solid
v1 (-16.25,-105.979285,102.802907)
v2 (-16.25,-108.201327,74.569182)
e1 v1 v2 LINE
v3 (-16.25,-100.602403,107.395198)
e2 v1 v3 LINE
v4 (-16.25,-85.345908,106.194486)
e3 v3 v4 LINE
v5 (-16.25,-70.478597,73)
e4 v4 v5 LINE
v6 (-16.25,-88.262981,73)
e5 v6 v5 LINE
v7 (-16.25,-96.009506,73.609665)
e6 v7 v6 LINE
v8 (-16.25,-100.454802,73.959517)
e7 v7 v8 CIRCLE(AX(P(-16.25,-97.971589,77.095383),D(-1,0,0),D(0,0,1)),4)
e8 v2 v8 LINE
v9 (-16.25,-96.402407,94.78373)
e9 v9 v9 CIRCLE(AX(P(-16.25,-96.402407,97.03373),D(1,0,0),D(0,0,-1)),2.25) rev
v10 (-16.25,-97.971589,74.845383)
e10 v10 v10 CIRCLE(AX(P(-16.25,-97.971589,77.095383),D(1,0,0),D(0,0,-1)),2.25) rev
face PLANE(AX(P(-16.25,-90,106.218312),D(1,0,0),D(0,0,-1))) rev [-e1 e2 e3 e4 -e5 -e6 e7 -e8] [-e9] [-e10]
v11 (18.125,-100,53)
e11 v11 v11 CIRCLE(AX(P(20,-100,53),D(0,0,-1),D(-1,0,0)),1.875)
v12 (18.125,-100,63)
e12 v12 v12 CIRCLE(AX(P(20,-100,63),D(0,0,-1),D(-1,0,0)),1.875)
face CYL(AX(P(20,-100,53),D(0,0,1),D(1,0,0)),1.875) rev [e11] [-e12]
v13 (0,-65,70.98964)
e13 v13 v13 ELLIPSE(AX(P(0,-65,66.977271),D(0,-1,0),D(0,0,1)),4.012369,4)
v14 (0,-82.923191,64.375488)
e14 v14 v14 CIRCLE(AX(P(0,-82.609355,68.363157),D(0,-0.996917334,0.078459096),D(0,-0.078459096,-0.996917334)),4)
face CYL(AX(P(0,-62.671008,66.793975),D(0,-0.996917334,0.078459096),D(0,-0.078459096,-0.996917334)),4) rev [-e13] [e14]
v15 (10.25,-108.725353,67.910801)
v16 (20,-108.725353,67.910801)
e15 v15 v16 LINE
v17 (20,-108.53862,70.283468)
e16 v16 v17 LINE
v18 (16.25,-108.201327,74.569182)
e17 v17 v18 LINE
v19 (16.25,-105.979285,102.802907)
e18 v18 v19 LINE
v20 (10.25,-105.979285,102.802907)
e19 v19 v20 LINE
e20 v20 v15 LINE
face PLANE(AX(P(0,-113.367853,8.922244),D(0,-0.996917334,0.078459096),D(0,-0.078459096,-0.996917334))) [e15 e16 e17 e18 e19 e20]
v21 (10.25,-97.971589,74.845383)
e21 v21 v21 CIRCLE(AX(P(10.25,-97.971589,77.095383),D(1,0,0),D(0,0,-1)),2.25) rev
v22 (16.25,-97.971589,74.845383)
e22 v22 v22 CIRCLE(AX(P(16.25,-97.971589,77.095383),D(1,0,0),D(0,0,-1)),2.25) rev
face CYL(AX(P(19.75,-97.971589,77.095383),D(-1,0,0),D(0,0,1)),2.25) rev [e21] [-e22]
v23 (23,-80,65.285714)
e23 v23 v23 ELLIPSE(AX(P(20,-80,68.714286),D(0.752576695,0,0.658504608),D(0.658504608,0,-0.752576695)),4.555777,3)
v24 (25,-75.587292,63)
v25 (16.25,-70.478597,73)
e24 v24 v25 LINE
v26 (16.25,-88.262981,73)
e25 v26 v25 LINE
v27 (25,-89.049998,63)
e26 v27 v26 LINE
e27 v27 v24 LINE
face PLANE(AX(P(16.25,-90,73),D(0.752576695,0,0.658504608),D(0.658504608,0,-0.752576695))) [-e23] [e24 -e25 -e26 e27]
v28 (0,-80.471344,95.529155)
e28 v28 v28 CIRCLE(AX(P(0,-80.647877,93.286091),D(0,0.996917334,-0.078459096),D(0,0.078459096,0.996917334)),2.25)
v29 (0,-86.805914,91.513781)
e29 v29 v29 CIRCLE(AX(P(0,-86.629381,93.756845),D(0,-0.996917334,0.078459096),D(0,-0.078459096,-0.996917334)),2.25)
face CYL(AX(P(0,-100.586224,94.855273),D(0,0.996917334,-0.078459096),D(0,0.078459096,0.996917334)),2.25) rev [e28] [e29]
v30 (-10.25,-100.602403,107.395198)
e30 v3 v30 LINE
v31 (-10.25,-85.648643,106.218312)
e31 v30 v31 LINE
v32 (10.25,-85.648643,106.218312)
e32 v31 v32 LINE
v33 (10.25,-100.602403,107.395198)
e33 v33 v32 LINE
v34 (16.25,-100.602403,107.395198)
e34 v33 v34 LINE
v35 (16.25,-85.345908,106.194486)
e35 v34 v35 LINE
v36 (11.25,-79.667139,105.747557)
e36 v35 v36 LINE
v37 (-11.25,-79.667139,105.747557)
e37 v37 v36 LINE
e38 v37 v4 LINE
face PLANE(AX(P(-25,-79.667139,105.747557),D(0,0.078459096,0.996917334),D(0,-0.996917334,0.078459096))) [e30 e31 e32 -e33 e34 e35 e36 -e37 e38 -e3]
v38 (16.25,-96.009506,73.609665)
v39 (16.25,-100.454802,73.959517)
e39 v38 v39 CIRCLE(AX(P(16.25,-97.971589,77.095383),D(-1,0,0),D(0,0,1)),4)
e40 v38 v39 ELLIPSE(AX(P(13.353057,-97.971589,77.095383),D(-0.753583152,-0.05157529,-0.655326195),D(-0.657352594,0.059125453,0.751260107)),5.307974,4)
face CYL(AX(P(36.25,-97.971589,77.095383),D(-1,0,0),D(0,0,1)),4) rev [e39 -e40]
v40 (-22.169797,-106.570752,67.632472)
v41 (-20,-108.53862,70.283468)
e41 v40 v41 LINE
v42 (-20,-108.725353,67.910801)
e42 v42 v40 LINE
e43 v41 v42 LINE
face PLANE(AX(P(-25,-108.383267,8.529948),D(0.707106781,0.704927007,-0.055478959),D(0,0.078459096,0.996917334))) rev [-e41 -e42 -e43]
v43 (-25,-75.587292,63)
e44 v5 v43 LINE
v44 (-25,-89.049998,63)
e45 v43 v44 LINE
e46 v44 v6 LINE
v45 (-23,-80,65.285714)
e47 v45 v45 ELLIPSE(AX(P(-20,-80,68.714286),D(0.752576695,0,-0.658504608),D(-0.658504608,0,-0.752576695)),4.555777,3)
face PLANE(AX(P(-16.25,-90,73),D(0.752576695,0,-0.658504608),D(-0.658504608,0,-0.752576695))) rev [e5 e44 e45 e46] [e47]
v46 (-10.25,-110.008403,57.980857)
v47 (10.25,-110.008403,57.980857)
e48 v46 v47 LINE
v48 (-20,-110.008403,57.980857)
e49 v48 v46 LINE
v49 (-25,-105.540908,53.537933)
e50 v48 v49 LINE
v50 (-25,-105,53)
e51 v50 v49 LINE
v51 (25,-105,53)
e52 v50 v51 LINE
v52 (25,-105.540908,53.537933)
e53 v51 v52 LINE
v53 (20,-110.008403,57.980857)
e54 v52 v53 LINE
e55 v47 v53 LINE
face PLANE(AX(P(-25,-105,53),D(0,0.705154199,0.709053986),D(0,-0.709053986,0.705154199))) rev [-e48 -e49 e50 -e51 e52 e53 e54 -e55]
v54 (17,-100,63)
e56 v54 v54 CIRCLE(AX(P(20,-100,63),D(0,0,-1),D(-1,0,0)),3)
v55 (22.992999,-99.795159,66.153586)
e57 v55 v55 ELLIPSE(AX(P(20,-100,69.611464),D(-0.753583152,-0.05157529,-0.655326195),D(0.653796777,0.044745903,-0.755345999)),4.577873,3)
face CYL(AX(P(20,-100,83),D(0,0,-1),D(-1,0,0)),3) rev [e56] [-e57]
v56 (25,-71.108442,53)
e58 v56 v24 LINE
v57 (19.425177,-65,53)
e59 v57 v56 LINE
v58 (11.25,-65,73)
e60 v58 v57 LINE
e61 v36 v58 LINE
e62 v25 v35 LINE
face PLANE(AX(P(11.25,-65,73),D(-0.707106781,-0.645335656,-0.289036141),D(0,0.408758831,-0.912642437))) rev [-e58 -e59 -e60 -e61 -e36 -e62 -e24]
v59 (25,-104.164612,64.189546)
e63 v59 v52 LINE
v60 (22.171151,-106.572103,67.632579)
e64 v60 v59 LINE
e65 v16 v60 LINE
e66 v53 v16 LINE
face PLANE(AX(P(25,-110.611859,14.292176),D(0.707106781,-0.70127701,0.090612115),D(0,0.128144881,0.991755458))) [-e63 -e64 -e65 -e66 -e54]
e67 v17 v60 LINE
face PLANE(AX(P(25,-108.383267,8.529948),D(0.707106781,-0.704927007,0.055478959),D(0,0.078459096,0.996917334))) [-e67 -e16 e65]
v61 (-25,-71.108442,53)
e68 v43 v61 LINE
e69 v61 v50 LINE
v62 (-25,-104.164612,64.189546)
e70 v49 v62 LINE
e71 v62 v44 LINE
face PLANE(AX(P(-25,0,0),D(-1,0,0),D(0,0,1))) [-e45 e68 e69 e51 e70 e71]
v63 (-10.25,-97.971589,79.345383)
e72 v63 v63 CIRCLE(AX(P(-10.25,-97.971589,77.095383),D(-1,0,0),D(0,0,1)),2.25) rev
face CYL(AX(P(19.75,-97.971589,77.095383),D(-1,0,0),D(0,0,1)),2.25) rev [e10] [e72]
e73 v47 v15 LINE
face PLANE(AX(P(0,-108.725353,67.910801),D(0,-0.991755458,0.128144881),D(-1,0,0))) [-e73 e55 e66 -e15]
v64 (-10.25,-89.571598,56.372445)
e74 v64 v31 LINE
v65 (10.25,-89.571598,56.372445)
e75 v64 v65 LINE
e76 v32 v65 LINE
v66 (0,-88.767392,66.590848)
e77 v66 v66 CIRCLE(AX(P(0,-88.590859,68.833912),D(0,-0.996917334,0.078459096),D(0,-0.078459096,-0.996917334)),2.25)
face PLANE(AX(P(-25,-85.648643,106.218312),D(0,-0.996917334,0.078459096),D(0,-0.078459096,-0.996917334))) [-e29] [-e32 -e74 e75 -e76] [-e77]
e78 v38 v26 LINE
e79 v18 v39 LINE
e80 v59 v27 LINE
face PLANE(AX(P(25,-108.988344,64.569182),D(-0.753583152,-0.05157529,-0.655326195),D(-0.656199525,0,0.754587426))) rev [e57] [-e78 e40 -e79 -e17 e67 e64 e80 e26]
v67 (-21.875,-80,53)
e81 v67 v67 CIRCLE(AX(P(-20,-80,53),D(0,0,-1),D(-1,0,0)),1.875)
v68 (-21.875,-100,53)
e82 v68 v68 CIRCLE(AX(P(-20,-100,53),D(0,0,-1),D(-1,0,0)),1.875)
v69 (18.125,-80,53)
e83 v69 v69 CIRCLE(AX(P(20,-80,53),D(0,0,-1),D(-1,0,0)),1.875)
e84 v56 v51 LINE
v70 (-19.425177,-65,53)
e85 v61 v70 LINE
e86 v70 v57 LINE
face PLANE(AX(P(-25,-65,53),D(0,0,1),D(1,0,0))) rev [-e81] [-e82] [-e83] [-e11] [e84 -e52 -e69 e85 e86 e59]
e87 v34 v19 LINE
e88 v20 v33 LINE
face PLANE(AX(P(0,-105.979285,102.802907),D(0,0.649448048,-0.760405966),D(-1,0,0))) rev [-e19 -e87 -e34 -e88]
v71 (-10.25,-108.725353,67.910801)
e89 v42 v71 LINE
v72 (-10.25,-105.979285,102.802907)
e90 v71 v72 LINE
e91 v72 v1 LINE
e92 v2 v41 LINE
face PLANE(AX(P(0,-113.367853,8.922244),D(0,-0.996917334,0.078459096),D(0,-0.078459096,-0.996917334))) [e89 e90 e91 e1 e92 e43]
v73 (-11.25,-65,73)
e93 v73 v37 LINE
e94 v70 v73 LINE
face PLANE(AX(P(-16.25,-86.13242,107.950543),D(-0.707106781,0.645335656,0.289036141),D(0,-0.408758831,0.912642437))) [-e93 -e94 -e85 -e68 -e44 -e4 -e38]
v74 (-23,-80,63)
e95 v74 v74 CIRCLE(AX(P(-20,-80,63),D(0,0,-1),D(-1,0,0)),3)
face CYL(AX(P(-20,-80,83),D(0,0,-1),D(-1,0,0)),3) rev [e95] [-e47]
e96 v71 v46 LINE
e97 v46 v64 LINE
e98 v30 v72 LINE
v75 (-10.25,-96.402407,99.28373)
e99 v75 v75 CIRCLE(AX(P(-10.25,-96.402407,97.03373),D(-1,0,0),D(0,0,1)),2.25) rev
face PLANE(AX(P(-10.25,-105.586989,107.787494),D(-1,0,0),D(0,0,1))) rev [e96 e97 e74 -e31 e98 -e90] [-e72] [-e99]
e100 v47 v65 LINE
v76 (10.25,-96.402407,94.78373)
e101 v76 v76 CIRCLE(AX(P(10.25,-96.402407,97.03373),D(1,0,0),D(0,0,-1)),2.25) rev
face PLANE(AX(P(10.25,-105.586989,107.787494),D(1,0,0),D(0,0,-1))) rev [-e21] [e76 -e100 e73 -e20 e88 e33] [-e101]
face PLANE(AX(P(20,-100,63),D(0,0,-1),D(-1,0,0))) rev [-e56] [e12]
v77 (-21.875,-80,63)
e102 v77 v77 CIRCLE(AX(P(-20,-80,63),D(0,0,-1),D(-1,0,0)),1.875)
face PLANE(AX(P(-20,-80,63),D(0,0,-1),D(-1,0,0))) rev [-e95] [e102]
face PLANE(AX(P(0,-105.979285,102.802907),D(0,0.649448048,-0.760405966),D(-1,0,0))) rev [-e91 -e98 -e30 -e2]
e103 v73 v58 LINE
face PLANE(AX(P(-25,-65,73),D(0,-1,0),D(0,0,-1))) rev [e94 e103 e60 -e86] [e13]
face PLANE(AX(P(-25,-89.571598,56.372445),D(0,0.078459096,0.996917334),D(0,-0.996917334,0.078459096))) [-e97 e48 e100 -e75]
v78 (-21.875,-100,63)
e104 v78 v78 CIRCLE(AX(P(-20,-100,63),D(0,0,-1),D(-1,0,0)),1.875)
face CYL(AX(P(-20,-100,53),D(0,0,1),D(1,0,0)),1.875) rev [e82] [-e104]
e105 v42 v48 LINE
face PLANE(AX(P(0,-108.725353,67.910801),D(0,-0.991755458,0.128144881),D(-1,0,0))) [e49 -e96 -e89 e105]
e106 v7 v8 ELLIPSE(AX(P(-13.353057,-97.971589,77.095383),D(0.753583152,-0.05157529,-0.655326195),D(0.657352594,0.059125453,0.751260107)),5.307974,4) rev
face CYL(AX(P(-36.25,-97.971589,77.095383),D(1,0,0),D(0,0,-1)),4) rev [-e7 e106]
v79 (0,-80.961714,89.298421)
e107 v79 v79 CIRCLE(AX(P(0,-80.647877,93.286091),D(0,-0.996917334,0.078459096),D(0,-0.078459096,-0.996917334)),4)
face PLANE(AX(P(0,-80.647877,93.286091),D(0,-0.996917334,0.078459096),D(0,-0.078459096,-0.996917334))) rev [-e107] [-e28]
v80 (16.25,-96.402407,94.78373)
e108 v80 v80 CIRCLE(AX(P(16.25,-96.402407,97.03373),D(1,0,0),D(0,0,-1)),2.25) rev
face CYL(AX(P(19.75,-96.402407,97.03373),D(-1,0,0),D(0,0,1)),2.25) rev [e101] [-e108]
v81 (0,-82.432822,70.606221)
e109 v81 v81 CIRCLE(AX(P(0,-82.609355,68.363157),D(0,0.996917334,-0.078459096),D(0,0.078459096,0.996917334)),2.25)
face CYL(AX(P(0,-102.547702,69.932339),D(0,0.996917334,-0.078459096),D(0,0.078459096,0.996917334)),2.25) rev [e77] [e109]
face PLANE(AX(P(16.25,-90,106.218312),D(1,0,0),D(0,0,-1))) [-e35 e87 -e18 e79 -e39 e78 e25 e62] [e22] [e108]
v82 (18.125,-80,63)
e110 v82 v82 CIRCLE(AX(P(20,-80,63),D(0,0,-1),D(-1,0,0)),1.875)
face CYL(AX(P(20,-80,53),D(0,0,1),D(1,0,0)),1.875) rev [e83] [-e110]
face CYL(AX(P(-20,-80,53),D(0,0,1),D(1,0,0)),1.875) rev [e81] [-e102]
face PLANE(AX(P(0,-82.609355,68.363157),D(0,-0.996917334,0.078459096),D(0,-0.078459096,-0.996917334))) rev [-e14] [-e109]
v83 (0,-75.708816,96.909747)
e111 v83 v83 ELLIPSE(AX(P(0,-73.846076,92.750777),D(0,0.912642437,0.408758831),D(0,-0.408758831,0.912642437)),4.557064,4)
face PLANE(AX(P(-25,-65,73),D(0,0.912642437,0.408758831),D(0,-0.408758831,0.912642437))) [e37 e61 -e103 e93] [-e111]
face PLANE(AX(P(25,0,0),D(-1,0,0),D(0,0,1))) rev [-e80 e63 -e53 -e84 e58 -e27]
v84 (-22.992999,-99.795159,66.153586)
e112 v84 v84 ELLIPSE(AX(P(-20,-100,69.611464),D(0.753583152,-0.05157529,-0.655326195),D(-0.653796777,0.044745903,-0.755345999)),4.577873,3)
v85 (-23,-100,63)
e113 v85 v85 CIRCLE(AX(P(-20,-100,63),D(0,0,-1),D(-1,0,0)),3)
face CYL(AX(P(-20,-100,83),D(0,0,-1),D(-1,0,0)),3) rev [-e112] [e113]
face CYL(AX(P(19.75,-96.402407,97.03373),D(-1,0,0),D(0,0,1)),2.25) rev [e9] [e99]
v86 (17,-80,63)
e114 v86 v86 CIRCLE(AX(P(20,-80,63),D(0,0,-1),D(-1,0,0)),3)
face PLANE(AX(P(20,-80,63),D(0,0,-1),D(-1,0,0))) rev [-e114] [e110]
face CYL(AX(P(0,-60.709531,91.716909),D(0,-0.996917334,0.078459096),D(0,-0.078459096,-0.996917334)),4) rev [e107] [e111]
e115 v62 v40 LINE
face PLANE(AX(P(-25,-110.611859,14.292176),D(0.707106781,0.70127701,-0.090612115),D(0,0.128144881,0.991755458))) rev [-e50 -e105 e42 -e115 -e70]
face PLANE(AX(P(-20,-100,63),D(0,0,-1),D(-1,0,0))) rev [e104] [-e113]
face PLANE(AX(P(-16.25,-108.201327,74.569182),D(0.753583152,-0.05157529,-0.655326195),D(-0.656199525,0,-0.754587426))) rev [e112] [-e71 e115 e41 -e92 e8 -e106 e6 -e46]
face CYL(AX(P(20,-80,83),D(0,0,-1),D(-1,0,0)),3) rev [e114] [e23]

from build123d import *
from OCP.BRepFilletAPI import BRepFilletAPI_MakeChamfer

# Parameters (mm, degrees)
BOSS_EXTRUDE1_DEPTH      = 25
BOSS_EXTRUDE1_DEPTH_BACK = 25
CUT_EXTRUDE1_DEPTH       = 25
BOSS_EXTRUDE3_DEPTH      = 20
CHAMFER2_SIZE            = 10
CHAMFER2_SIZE_2          = 0.5
SKETCH5_R                = 4
CUT_EXTRUDE4_DEPTH       = 20
SKETCH6_R                = 2.25
CUT_EXTRUDE5_DEPTH       = 20
CUT_EXTRUDE6_DEPTH       = 30
CUT_EXTRUDE6_DEPTH_BACK  = 20
SKETCH7_R                = 2.25
SKETCH8_R                = 4
CUT_EXTRUDE7_DEPTH       = 20
CUT_EXTRUDE10_DEPTH      = 10
CUT_EXTRUDE10_DEPTH_BACK = 10
SKETCH10_R               = 1.875
SKETCH10_9_R             = 3
SKETCH10_9_R_2           = 1.875
CUT_EXTRUDE11_DEPTH      = 20
CHAMFER3_START           = -141.531055451
CHAMFER3_DEPTH           = 67.531055451
CHAMFER4_SIZE            = 5
CHAMFER5_START           = 49.569652266
CHAMFER5_DEPTH           = 20.503333196
CHAMFER5_START_2         = -70.072985462
CHAMFER5_2_DEPTH         = 20.503333196


with BuildPart() as part:
    # Sketch1 → Boss-Extrude1 (new, two sides: drawn at the far end of the back side and taken through both)
    with BuildSketch(Plane(origin=(0, 0, 0), x_dir=(0, 0, -1), z_dir=(1, 0, 0)).offset(-BOSS_EXTRUDE1_DEPTH_BACK)):
        Polygon((-106.218311965, -85.648642757), (-56.372445278, -89.571597544), (-57.980856741, -110.008402885), (-53, -105), (-53, -65), (-73, -65), (-105.747557391, -79.667138755), align=None)
    extrude(amount=BOSS_EXTRUDE1_DEPTH + BOSS_EXTRUDE1_DEPTH_BACK)

    # Sketch2 → Cut-Extrude1 (cut)
    with BuildSketch(Plane(origin=(0, -65, 0), x_dir=(1, 0, 0), z_dir=(0, 1, 0))):
        Polygon((16.25, -106.218311965), (16.25, -73), (25, -63), (25, -106.218311965), align=None)
        Polygon((-25, -106.218311965), (-16.25, -106.218311965), (-16.25, -73), (-25, -63), align=None)
    extrude(amount=-CUT_EXTRUDE1_DEPTH, mode=Mode.SUBTRACT)

    # Sketch3 → Boss-Extrude3 (add)
    with BuildSketch(Plane(origin=(0, -93.429506703, 7.353061645), x_dir=(1, 0, 0), z_dir=(0, -0.9969173337331282, 0.07845909572784136))):
        Polygon((10.25, 99.170961297), (10.25, 49.170961297), (25, 49.170961297), (25, 55.819009733), (16.25, 65.849931718), (16.25, 99.170961297), align=None)
        Polygon((-10.25, 99.170961297), (-10.25, 49.170961297), (-25, 49.170961297), (-25, 55.819009733), (-16.25, 65.849931718), (-16.25, 99.170961297), align=None)
    extrude(amount=BOSS_EXTRUDE3_DEPTH)

    # Chamfer2
    chamfer2_edges_1 = [part.edges().sort_by_distance(p)[0] for p in [
        (17.625, -109.509944218, 57.941627193),
    ]]
    chamfer2_side_1 = [part.faces().sort_by_distance(p)[0] for p in [
        (17.625, -109.509159627, 57.951596366),
    ]]
    chamfer2_edges_2 = [part.edges().sort_by_distance(p)[0] for p in [
        (-17.625, -109.509944218, 57.941627193),
    ]]
    chamfer2_side_2 = [part.faces().sort_by_distance(p)[0] for p in [
        (-17.625, -109.509159627, 57.951596366),
    ]]
    chamfer2 = BRepFilletAPI_MakeChamfer(part.part.solid().wrapped)
    for e in chamfer2_edges_1:
        chamfer2.Add(CHAMFER2_SIZE - 0.0001, CHAMFER2_SIZE_2 - 0.0001, e.wrapped, chamfer2_side_1[0].wrapped)
    for e in chamfer2_edges_2:
        chamfer2.Add(CHAMFER2_SIZE - 0.0001, CHAMFER2_SIZE_2 - 0.0001, e.wrapped, chamfer2_side_2[0].wrapped)
    add(Compound.cast(chamfer2.Shape()), mode=Mode.REPLACE)  # a hair under: the kernel refuses the full size

    # Sketch5 → Cut-Extrude4 (cut)
    with BuildSketch(Plane(origin=(0, -87.448002701, 6.882307071), x_dir=(-1, 0, 0), z_dir=(0, -0.9969173337331282, 0.07845909572784136))):
        with Locations(Location((0, -61.670961297, 0), (0, 0, 90))):
            Circle(SKETCH5_R)
        with Locations(Location((0, -86.670961297, 0), (0, 0, 90))):
            Circle(SKETCH5_R)
    extrude(amount=-CUT_EXTRUDE4_DEPTH, mode=Mode.SUBTRACT)

    # Sketch6 → Cut-Extrude5 (cut)
    with BuildSketch(Plane(origin=(0, -87.448002701, 6.882307071), x_dir=(1, 0, 0), z_dir=(0, 0.9969173337331282, -0.07845909572784135))):
        with Locations(Location((0, -61.670961297, 0), (0, 0, 270))):
            Circle(SKETCH6_R)
        with Locations(Location((0, -86.670961297, 0), (0, 0, 270))):
            Circle(SKETCH6_R)
    extrude(amount=-CUT_EXTRUDE5_DEPTH, mode=Mode.SUBTRACT)

    # Sketch7 → Cut-Extrude6 (cut, two sides: drawn at the far end of the back side and taken through both)
    with BuildSketch(Plane(origin=(-10.25, 0, 0), x_dir=(0, 0, -1), z_dir=(1, 0, 0)).offset(-CUT_EXTRUDE6_DEPTH_BACK)):
        with Locations((-97.033729585, -96.402407052)):
            Circle(SKETCH7_R)
        with Locations((-77.09538291, -97.971588966)):
            Circle(SKETCH7_R)
    extrude(amount=CUT_EXTRUDE6_DEPTH + CUT_EXTRUDE6_DEPTH_BACK, mode=Mode.SUBTRACT)

    # Sketch8 → Cut-Extrude7 (cut)
    with BuildSketch(Plane.ZY.offset(16.25)):
        with Locations((77.09538291, -97.971588966)):
            Circle(SKETCH8_R)
    cut_extrude7 = extrude(amount=CUT_EXTRUDE7_DEPTH, mode=Mode.SUBTRACT)

    # Mirror1: Cut-Extrude7 across plane
    add(cut_extrude7.mirror(Plane.ZY), mode=Mode.SUBTRACT)

    # Sketch10 → Cut-Extrude10 (cut, two sides: drawn at the far end of the back side and taken through both)
    with BuildSketch(Plane(origin=(0, 0, 63), x_dir=(-1, 0, 0), z_dir=(0, 0, -1)).offset(-CUT_EXTRUDE10_DEPTH_BACK)):
        with Locations(Location((-20, -100, 0), (0, 0, 356.084777763))):
            Circle(SKETCH10_R)
        with Locations((-20, -80)):
            Circle(SKETCH10_R)
        with Locations(Location((20, -80, 0), (0, 0, 180))):
            Circle(SKETCH10_R)
        with Locations(Location((20, -100, 0), (0, 0, 183.915222237))):
            Circle(SKETCH10_R)
    extrude(amount=CUT_EXTRUDE10_DEPTH + CUT_EXTRUDE10_DEPTH_BACK, mode=Mode.SUBTRACT)

    # Sketch10<9> → Cut-Extrude11 (cut)
    # profile 1 of 4: a face of its own
    with BuildSketch(Plane(origin=(0, 0, 63), x_dir=(-1, 0, 0), z_dir=(0, 0, -1))):
        with Locations((20, -100)):
            Circle(SKETCH10_9_R)
        with Locations((20, -100)):
            Circle(SKETCH10_9_R_2, mode=Mode.SUBTRACT)
    # profile 2 of 4: a face of its own
    with BuildSketch(Plane(origin=(0, 0, 63), x_dir=(-1, 0, 0), z_dir=(0, 0, -1))):
        with Locations((20, -80)):
            Circle(SKETCH10_9_R)
        with Locations((20, -80)):
            Circle(SKETCH10_9_R_2, mode=Mode.SUBTRACT)
    # profile 3 of 4: a face of its own
    with BuildSketch(Plane(origin=(0, 0, 63), x_dir=(-1, 0, 0), z_dir=(0, 0, -1))):
        with Locations((-20, -80)):
            Circle(SKETCH10_9_R)
        with Locations((-20, -80)):
            Circle(SKETCH10_9_R_2, mode=Mode.SUBTRACT)
    # profile 4 of 4: a face of its own
    with BuildSketch(Plane(origin=(0, 0, 63), x_dir=(-1, 0, 0), z_dir=(0, 0, -1))):
        with Locations((-20, -100)):
            Circle(SKETCH10_9_R)
        with Locations((-20, -100)):
            Circle(SKETCH10_9_R_2, mode=Mode.SUBTRACT)
    extrude(amount=-CUT_EXTRUDE11_DEPTH, mode=Mode.SUBTRACT)

    # Chamfer3: read off the stored shape, not the designer's step
    # Chamfer3 outline → Chamfer3 (cut)
    with BuildSketch(Plane(origin=(0, 0, 0), x_dir=(1, 0, 0), z_dir=(0, 0.4087588305450842, -0.9126424373495983)).offset(CHAMFER3_START)):
        Polygon((-25, 43.232363798), (-25, 28), (-9.767636202, 28), align=None)
        Polygon((9.767636202, 28), (25, 28), (25, 43.232363798), align=None)
    extrude(amount=CHAMFER3_DEPTH, mode=Mode.SUBTRACT)

    # Chamfer4
    chamfer4_edges = [part.edges().sort_by_distance(p)[0] for p in [
        (-13.25, -105.586989432, 107.78749388),
        (13.25, -105.586989432, 107.78749388),
    ]]
    chamfer(chamfer4_edges, length=CHAMFER4_SIZE)

    # Chamfer5: read off the stored shape, not the designer's step
    # Chamfer5 outline → Chamfer5 (cut)
    with BuildSketch(Plane(origin=(0, 0, 0), x_dir=(0.7072170856964756, 0.7032116882513418, -0.0730569312637863), z_dir=(0.7069964594670781, -0.7034311334001396, 0.07307972950423045)).offset(CHAMFER5_START)):
        Polygon((-95.809344587, 42.345340215), (-95.562635623, 56.312202838), (-95.604662607, 58.691464219), (-95.627776424, 60), (-100, 60), (-100, 41), (-95.833108513, 41), align=None)
    extrude(amount=CHAMFER5_DEPTH, mode=Mode.SUBTRACT)

    # Chamfer5 2 outline → Chamfer5 2 (cut)
    with BuildSketch(Plane(origin=(0, 0, 0), x_dir=(0.7072170856964753, -0.7032116882513376, 0.0730569312638283), z_dir=(0.7069964594670783, 0.7034311334001349, -0.0730797295042724)).offset(CHAMFER5_START_2)):
        Polygon((95.809344587, -42.345340215), (95.562635623, -56.312202838), (95.604662607, -58.691464219), (95.627776424, -60), (100, -60), (100, -41), (95.833108513, -41), align=None)
    extrude(amount=CHAMFER5_2_DEPTH, mode=Mode.SUBTRACT)


solid = part.part
